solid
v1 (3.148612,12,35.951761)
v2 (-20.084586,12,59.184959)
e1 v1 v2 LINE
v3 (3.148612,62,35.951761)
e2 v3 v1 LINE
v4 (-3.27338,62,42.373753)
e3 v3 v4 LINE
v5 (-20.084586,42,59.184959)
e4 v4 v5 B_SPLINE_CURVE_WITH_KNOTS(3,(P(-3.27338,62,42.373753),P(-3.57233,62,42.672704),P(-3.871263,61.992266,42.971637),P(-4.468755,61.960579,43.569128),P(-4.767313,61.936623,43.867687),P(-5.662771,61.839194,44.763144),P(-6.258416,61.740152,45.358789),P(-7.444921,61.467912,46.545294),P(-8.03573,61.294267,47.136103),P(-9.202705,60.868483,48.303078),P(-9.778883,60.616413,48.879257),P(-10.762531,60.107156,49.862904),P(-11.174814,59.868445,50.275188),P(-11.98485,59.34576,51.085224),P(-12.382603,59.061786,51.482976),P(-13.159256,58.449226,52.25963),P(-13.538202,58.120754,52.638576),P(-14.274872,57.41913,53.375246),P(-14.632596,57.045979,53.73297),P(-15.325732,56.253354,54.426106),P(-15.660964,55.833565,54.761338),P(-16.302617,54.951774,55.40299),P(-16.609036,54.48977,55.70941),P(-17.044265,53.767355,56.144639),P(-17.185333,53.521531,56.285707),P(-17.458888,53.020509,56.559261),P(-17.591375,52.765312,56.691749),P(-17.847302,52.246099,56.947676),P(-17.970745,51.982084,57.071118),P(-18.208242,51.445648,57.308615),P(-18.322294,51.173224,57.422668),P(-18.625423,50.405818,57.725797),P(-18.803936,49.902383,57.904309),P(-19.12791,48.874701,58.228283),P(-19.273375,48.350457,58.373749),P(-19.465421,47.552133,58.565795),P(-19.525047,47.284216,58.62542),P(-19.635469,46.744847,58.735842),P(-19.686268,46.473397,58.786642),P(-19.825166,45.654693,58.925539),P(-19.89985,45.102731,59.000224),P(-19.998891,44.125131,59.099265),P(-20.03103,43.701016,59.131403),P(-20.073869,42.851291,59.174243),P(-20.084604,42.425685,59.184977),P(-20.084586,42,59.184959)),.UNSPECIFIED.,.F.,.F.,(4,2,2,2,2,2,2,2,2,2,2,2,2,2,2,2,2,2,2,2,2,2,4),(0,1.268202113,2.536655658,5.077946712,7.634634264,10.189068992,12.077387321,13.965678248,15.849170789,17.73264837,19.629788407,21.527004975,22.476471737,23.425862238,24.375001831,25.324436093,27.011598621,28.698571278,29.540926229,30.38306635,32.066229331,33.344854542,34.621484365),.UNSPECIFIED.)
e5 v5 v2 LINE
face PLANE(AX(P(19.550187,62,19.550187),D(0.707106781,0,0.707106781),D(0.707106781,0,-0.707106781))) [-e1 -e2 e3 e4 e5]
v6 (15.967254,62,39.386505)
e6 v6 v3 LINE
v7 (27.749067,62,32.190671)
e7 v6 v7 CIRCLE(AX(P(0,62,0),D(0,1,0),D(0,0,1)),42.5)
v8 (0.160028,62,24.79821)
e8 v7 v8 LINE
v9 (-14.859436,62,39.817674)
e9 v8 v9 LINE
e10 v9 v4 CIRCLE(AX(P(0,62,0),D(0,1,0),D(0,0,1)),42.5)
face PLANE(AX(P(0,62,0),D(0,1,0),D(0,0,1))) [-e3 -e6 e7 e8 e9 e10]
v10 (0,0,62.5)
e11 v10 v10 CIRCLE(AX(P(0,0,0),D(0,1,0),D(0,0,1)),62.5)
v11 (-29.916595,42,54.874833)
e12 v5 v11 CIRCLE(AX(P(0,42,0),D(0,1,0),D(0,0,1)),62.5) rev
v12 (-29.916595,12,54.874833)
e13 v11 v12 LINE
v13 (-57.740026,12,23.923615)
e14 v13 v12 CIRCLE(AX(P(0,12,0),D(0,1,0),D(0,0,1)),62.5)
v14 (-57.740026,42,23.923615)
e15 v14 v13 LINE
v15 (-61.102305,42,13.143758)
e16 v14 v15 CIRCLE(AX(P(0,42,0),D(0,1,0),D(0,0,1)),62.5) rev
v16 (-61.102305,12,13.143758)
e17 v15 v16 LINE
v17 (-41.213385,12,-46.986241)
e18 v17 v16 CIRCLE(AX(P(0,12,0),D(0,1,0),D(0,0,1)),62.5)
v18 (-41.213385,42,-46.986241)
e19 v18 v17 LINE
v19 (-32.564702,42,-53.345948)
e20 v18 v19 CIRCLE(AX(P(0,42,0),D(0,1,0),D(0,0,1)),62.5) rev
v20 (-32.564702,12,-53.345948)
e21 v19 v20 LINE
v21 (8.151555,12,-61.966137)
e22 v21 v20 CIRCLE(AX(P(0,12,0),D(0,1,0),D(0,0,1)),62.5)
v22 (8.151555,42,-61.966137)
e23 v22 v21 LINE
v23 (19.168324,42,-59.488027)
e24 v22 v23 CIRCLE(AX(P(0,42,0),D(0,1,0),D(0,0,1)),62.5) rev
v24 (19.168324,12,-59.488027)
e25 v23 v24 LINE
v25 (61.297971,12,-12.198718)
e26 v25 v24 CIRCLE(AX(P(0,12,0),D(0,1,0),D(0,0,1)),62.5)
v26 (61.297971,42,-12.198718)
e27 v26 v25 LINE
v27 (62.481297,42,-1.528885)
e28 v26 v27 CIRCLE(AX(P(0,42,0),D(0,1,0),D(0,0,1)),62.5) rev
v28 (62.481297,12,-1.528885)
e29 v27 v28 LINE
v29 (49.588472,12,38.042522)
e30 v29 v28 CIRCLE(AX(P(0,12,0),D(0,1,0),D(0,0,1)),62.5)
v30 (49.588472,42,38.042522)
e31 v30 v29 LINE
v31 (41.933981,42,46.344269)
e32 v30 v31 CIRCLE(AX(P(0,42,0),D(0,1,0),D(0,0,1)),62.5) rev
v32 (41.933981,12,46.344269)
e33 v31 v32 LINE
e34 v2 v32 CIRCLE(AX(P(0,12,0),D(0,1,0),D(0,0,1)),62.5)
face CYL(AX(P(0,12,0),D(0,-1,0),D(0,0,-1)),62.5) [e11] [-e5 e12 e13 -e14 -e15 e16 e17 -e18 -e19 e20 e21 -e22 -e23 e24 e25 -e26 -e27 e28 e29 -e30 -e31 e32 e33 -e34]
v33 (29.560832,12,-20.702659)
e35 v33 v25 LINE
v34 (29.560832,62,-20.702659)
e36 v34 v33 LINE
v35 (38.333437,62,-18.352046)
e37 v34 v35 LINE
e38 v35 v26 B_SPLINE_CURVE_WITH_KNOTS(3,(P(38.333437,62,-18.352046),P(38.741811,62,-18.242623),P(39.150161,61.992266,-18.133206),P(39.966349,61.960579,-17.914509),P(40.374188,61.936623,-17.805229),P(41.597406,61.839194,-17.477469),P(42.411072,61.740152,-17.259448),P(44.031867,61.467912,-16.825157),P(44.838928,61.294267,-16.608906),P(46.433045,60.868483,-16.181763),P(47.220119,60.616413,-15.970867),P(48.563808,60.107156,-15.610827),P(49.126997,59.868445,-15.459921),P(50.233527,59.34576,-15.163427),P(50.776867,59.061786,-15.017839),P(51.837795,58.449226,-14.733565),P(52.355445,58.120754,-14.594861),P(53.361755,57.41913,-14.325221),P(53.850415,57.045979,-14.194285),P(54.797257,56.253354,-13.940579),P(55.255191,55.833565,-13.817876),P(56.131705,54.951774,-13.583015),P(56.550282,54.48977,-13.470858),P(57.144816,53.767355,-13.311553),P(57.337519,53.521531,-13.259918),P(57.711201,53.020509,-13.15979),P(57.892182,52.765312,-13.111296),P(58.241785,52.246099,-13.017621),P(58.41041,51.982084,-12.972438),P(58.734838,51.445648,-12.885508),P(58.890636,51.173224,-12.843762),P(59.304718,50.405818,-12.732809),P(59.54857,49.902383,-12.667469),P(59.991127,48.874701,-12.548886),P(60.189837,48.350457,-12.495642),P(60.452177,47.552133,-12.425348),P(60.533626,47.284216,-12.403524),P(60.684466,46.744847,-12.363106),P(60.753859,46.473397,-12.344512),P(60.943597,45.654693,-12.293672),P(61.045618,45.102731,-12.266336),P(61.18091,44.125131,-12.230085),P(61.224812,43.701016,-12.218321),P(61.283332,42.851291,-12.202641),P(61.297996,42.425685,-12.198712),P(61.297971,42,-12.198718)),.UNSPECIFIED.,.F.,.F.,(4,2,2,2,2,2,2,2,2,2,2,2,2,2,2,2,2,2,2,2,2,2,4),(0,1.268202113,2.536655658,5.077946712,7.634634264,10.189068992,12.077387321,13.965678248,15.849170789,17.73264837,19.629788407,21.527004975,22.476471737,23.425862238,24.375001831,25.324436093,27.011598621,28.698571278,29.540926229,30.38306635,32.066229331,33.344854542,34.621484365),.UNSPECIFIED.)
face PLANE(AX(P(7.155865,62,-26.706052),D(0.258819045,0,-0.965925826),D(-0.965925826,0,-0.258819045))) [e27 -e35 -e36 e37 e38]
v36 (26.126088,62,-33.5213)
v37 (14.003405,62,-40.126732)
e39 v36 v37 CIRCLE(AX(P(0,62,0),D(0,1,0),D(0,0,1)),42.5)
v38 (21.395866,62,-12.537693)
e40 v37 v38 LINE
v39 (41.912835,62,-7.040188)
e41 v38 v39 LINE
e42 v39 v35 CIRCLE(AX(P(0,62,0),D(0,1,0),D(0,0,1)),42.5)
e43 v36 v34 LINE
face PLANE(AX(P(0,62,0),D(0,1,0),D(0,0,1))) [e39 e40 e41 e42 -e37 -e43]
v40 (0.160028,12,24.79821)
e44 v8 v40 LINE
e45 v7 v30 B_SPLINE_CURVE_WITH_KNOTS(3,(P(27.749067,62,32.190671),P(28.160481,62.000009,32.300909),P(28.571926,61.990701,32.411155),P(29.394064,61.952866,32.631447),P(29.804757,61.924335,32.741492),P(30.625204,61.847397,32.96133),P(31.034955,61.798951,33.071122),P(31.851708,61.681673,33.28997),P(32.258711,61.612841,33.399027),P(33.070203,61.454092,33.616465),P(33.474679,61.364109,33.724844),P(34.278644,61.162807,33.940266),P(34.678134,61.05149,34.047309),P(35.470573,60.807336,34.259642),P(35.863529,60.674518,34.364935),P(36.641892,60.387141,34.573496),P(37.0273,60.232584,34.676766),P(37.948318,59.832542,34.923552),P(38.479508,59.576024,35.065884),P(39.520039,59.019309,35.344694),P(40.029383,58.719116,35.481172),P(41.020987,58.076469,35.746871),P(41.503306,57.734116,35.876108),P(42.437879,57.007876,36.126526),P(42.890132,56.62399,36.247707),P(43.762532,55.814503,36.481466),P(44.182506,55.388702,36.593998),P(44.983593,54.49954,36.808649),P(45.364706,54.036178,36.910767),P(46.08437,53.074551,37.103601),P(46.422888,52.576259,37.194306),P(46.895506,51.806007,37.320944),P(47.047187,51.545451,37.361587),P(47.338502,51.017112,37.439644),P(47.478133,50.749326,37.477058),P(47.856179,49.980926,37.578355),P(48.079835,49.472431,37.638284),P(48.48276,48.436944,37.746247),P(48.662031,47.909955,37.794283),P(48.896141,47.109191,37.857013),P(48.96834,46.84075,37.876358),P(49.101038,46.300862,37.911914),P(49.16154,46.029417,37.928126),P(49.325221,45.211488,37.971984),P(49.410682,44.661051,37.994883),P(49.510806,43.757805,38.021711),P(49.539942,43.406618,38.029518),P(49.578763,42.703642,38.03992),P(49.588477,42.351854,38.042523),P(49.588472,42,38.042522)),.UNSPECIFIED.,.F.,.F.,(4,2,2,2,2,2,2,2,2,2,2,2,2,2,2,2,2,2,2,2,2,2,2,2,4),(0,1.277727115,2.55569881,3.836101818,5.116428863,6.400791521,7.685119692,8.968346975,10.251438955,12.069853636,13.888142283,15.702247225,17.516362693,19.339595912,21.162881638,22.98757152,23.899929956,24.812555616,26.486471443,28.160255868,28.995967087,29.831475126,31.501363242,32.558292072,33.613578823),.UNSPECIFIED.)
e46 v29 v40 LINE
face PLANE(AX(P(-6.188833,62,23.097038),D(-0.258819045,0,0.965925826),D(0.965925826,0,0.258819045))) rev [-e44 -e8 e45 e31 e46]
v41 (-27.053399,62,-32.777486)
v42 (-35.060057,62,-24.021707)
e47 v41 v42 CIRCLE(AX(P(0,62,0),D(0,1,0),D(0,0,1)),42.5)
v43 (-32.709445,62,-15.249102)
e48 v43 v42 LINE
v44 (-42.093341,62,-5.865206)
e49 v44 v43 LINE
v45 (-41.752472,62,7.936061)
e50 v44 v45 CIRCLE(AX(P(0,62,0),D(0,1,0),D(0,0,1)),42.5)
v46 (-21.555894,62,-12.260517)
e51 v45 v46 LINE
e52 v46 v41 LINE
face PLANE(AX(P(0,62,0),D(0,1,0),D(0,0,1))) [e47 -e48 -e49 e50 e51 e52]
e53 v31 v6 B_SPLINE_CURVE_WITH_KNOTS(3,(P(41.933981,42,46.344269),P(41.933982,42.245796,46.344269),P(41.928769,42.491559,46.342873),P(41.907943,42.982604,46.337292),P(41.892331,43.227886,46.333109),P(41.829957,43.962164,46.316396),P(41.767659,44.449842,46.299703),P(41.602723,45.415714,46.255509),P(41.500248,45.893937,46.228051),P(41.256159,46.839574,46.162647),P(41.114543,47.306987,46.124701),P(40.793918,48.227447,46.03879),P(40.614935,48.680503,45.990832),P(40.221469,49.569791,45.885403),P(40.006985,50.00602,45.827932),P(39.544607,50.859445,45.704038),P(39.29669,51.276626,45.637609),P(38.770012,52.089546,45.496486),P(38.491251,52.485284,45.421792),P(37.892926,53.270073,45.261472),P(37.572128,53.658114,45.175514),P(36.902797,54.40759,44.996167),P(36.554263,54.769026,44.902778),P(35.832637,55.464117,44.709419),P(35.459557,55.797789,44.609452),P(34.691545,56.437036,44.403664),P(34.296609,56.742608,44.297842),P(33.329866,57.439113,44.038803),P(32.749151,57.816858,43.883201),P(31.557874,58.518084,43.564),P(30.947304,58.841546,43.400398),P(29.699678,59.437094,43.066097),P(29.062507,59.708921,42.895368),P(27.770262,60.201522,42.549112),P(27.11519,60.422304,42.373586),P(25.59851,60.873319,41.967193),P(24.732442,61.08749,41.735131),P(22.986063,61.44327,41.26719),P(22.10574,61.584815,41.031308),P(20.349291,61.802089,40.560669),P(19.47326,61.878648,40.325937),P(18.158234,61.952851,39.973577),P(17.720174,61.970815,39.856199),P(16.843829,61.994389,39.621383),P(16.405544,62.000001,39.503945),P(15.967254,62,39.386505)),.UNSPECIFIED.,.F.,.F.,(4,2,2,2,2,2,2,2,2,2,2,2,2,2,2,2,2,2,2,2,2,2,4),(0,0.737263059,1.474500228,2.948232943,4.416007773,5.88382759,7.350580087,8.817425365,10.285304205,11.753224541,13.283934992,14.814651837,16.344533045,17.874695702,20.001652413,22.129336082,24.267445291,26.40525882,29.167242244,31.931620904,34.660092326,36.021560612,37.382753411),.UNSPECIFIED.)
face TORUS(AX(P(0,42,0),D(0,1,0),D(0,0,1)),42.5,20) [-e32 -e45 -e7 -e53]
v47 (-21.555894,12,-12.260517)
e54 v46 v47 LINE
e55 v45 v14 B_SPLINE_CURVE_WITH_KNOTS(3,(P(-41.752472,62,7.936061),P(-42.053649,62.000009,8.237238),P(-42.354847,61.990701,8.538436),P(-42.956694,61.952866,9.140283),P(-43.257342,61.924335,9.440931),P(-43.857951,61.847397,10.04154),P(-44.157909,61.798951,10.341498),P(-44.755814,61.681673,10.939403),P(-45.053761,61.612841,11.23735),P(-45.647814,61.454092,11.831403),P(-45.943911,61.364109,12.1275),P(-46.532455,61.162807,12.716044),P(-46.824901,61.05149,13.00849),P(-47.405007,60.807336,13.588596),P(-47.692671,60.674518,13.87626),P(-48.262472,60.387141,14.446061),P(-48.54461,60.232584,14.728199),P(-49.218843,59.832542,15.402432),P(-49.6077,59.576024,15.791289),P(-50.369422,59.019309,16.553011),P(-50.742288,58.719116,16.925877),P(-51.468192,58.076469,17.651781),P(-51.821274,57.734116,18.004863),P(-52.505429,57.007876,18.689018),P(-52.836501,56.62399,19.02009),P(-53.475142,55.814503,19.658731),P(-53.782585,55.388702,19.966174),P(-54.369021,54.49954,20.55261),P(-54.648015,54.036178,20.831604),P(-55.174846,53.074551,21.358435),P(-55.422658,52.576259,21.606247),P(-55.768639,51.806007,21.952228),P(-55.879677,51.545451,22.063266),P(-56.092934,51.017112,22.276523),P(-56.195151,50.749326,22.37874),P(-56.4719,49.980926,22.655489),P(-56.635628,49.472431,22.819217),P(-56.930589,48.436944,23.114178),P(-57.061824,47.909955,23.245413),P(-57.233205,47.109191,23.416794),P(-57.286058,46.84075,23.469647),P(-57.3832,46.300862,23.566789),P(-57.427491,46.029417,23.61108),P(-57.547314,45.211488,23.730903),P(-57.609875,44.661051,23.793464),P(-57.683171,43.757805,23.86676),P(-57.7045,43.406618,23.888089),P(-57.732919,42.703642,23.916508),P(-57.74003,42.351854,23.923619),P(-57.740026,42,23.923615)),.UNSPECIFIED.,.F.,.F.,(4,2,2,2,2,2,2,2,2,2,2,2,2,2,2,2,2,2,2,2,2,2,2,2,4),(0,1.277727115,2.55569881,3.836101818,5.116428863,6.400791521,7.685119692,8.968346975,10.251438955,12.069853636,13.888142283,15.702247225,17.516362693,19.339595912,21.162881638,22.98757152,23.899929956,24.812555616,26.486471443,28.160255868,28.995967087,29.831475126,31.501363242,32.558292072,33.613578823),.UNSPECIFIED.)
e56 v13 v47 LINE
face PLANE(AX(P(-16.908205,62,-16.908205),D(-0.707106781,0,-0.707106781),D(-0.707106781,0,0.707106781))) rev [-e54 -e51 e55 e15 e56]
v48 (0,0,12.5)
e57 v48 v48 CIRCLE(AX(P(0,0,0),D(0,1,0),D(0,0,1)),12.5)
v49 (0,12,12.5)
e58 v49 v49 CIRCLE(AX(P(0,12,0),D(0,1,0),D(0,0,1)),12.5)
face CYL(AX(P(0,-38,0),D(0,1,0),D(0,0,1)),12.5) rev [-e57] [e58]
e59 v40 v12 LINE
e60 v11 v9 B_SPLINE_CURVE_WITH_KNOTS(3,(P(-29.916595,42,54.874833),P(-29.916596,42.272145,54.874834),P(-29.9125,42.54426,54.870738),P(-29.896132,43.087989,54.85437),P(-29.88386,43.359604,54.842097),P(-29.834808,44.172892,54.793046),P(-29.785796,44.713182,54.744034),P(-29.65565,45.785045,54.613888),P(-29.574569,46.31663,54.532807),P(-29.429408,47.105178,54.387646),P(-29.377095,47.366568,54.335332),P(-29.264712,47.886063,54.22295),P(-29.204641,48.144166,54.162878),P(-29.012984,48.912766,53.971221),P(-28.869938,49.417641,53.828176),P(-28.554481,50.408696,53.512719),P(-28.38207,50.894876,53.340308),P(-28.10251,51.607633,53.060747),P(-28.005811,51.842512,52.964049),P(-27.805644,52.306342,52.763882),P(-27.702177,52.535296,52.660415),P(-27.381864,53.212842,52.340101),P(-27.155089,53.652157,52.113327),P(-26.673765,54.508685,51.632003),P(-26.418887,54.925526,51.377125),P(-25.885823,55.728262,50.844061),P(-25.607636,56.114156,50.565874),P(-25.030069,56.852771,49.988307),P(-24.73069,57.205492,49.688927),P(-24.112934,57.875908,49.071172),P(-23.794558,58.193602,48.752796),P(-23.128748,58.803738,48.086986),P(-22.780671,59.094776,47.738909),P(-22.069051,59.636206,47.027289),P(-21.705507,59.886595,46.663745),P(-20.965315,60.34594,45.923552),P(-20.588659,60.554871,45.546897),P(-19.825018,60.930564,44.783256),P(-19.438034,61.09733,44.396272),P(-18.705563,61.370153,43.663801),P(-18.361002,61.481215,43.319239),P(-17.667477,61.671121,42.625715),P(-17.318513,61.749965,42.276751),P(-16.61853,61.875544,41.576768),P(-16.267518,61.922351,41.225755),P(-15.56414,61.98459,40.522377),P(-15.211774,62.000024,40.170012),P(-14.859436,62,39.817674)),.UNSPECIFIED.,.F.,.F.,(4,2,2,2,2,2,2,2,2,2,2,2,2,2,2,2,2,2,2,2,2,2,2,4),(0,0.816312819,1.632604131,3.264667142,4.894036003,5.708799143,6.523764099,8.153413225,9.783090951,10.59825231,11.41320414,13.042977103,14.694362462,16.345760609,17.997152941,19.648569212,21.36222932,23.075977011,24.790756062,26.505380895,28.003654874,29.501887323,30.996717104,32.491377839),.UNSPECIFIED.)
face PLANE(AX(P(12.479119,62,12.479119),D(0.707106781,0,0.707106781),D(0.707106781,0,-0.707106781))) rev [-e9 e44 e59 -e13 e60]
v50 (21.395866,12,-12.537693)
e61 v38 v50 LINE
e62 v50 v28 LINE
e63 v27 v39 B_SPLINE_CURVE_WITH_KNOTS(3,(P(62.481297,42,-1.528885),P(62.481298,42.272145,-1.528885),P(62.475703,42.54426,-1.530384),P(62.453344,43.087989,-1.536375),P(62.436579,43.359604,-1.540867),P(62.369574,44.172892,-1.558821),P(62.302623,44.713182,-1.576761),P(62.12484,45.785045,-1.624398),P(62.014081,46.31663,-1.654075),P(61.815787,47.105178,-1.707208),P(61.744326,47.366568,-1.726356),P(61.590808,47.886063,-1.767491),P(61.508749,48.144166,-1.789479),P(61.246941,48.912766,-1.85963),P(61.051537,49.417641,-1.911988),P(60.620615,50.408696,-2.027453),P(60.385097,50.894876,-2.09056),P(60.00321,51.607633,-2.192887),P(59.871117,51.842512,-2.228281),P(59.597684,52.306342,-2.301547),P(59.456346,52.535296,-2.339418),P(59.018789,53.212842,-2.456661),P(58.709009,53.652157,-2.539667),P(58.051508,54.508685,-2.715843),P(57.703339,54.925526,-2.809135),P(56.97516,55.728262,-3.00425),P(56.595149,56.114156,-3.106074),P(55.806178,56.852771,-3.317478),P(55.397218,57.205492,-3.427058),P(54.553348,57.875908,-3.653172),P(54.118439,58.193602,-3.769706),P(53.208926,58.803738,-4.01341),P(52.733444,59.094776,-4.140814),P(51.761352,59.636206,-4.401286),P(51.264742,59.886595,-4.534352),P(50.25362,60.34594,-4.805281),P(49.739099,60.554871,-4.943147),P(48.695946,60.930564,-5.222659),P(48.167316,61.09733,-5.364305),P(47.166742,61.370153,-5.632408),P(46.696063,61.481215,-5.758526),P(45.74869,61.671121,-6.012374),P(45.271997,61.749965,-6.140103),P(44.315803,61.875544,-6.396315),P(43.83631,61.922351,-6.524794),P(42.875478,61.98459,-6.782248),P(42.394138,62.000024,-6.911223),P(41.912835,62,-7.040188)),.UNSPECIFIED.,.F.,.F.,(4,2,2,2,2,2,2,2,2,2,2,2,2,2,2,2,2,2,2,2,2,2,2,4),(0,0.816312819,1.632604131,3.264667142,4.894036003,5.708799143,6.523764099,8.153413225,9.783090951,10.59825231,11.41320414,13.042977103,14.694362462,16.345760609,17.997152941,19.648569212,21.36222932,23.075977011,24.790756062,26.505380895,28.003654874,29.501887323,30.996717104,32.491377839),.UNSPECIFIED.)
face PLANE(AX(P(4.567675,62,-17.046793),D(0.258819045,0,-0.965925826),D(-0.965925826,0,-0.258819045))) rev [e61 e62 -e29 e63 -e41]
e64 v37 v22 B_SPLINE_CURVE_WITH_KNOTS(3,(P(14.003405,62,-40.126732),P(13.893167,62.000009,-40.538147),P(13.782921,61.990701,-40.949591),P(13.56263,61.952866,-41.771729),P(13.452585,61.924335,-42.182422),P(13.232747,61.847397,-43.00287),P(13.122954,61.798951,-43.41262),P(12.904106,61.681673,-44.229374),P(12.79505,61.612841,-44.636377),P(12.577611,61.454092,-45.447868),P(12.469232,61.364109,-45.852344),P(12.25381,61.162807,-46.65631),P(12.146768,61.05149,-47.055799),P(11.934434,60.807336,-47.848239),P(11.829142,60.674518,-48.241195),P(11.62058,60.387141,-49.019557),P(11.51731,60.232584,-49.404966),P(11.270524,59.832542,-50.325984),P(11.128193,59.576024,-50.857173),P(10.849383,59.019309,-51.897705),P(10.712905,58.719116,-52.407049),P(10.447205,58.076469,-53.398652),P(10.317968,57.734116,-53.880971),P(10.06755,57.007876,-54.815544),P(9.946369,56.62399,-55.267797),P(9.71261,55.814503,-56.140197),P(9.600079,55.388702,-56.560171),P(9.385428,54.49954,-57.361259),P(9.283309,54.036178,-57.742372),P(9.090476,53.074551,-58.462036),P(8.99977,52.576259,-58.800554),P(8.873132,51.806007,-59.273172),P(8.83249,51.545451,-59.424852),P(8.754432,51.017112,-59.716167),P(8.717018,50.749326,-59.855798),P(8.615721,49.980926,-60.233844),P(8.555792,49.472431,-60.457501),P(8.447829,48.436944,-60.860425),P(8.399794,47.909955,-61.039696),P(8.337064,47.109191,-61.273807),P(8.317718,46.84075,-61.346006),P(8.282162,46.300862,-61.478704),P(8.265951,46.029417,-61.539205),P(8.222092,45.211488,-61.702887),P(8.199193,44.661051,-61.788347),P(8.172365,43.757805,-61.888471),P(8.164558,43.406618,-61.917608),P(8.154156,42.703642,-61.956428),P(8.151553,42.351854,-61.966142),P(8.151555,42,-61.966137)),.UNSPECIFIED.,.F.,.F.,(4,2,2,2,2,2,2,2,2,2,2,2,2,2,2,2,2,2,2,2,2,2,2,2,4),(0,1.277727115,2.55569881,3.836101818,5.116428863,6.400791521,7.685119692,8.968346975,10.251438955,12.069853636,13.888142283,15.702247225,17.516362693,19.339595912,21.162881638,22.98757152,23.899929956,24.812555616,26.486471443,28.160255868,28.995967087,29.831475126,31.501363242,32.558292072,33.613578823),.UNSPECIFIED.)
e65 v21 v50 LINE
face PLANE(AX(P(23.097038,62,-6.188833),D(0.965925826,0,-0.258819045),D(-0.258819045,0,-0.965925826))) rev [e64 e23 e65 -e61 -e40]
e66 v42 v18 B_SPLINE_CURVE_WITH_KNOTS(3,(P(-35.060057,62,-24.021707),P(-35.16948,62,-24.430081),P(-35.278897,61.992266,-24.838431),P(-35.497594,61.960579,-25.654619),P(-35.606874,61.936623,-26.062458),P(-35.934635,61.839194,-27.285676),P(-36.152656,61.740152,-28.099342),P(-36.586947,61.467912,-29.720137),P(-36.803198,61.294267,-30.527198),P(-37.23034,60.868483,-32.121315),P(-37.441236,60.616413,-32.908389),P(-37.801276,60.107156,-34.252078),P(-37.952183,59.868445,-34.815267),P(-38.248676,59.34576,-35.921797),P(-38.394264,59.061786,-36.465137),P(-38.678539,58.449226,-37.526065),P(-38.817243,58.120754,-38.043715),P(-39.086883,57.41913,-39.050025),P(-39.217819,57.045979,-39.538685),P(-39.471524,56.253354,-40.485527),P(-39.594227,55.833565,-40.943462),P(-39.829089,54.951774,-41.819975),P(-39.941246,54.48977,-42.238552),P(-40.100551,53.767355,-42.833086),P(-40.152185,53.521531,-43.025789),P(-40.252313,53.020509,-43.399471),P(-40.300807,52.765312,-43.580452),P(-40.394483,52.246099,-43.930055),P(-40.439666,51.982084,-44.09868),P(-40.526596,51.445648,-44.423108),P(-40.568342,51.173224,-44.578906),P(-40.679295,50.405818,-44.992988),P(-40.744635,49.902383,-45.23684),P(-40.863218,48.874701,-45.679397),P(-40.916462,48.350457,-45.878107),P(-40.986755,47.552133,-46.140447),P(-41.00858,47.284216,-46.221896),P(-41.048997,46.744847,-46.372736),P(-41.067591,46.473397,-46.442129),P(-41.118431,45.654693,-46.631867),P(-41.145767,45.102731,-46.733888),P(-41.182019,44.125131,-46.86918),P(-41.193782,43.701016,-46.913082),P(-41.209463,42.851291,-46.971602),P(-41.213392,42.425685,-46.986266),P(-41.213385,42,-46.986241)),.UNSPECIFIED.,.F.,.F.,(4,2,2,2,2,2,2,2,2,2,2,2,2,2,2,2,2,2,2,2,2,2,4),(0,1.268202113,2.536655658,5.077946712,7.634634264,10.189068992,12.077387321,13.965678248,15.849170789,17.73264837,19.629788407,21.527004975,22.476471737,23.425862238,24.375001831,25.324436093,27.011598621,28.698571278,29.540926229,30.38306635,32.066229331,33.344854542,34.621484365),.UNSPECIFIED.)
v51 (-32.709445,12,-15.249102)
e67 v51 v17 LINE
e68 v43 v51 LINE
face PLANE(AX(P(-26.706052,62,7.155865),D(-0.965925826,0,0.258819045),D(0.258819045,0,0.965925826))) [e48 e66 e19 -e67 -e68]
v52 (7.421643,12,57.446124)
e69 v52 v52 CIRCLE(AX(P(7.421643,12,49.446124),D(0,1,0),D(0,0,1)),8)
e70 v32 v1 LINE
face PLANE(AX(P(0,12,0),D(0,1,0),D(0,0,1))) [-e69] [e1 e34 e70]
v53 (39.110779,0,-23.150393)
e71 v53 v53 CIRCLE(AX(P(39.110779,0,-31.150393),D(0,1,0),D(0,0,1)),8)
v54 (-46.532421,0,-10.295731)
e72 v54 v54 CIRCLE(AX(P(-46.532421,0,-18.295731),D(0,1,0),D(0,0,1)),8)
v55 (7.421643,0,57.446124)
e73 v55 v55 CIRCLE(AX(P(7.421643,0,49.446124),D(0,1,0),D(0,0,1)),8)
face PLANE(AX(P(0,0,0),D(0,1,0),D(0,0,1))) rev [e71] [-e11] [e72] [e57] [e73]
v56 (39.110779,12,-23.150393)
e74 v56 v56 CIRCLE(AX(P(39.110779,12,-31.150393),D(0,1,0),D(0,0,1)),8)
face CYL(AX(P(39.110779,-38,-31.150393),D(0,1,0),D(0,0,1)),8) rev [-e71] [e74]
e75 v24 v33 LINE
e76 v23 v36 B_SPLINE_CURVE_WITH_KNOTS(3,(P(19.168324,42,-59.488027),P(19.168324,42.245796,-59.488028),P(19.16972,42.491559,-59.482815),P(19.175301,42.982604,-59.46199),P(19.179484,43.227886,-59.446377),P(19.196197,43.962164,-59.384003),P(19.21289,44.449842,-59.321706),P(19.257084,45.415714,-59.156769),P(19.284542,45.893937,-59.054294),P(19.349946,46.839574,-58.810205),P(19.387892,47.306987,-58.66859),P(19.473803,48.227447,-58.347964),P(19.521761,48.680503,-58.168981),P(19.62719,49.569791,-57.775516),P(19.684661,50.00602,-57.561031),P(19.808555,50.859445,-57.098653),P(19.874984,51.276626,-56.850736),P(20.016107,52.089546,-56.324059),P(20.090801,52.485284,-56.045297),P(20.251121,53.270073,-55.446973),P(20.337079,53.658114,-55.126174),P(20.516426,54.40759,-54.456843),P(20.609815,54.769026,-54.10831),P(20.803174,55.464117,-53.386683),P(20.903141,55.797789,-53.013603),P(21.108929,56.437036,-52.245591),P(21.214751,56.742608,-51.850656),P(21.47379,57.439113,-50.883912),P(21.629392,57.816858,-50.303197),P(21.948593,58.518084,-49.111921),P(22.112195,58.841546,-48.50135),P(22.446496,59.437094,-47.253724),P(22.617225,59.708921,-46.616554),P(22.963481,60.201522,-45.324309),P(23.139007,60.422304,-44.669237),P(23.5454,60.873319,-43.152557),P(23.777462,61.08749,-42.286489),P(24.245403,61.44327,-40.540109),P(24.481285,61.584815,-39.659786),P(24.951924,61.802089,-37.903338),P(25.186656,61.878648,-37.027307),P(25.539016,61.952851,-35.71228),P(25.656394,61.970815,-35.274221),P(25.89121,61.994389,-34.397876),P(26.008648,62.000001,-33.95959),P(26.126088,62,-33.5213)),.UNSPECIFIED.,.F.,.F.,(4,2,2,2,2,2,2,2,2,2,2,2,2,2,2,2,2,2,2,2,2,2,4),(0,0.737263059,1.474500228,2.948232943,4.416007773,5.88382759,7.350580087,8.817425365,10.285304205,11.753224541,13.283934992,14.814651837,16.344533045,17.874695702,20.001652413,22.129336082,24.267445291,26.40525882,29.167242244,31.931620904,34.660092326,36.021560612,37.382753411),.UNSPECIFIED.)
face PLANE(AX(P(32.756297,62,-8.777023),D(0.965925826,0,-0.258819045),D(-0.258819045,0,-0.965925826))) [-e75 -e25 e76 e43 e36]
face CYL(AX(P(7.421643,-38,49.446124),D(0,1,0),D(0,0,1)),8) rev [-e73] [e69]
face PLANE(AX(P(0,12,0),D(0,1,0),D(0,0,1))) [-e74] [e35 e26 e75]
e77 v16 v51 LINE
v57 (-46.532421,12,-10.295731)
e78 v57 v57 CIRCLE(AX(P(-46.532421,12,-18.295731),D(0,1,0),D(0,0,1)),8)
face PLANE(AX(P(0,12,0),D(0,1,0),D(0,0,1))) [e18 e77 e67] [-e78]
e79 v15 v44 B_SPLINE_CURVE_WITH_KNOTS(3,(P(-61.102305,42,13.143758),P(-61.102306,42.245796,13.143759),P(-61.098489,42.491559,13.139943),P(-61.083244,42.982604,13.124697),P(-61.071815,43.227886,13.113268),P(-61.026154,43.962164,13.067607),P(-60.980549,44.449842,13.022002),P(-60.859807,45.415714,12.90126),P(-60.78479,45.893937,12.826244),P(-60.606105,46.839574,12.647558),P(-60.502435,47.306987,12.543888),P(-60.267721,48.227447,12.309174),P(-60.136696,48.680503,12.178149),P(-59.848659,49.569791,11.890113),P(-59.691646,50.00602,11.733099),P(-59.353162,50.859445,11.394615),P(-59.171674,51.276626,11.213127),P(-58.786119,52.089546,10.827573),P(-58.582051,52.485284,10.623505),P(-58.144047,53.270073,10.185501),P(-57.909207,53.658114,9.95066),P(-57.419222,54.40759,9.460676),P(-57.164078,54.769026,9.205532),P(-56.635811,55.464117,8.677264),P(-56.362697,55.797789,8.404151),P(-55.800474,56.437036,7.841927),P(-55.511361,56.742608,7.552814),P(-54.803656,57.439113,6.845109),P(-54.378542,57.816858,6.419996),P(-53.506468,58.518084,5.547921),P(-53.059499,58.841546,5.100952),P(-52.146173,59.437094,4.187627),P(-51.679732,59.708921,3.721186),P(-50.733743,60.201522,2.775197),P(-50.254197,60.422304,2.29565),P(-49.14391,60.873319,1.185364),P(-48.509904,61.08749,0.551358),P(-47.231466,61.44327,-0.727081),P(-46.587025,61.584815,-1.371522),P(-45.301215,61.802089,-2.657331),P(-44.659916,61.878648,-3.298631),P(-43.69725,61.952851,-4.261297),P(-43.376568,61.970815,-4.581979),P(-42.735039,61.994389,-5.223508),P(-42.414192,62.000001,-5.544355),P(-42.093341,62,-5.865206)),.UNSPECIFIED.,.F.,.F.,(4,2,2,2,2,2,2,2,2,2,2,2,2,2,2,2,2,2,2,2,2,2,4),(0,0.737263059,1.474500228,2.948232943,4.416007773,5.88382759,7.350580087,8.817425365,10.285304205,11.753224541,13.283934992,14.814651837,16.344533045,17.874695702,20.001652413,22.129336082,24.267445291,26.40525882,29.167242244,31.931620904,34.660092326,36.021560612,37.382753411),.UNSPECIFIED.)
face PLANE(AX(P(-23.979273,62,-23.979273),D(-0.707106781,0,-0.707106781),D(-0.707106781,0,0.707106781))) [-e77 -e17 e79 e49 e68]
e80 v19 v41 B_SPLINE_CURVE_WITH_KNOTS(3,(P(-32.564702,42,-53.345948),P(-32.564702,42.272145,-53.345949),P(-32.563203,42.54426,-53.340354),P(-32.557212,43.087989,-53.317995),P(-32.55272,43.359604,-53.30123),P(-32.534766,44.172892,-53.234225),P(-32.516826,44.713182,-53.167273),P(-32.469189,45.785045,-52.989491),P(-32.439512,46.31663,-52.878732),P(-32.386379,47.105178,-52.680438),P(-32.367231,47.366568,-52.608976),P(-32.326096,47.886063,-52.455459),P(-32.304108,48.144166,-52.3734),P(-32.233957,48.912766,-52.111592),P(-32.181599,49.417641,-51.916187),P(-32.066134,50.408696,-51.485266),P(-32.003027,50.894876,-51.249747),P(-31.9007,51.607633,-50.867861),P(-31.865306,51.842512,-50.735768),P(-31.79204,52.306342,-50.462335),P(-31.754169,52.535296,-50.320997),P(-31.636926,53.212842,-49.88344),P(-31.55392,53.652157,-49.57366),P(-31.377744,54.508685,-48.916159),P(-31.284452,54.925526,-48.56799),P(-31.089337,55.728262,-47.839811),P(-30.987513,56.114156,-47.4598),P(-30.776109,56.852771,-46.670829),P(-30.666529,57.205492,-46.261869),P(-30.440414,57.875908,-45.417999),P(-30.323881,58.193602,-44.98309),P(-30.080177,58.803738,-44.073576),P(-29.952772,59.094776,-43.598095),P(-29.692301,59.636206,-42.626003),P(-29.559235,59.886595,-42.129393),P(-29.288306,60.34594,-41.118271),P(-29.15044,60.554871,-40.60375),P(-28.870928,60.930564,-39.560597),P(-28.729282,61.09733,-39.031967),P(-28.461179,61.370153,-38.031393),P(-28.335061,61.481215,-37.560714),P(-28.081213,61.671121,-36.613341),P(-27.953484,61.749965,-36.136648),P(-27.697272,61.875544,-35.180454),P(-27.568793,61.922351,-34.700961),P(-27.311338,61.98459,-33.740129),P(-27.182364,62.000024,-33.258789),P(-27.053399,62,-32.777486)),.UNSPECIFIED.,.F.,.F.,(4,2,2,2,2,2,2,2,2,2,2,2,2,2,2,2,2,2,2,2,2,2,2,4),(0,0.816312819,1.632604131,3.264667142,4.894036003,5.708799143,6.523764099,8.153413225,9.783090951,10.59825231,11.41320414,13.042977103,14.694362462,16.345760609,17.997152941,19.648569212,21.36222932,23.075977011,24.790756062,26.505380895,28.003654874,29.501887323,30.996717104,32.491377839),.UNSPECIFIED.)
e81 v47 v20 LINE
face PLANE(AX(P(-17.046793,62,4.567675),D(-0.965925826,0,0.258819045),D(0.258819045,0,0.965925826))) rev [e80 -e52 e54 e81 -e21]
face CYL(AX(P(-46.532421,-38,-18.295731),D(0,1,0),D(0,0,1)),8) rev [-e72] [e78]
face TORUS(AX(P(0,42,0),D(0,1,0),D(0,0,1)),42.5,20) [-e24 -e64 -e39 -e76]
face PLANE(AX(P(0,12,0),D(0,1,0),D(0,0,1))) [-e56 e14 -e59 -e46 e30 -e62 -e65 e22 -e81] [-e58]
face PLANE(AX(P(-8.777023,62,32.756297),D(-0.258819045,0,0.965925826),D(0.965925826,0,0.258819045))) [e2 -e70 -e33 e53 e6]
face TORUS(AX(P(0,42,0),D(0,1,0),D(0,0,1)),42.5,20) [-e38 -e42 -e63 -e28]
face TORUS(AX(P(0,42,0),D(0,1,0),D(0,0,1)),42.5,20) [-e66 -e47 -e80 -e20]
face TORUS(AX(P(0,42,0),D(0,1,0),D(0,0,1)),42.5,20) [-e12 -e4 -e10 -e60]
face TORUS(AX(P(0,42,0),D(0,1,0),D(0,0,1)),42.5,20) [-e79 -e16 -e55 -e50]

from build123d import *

# Parameters (mm, degrees)
SKETCH1_R           = 62.5
BOSS_EXTRUDE1_DEPTH = 12
BOSS_EXTRUDE2_DEPTH = 50
FILLET1_R           = 20
SKETCH3_R           = 12.5
CUT_EXTRUDE1_DEPTH  = 50
SKETCH4_R           = 8
CUT_EXTRUDE2_DEPTH  = 50


with BuildPart() as part:
    # Sketch1 → Boss-Extrude1 (new body)
    with BuildSketch(Plane(origin=(0, 0, 0), x_dir=(1, 0, 0), z_dir=(0, 1, 0))):
        with Locations(Location((0, 0, 0), (0, 0, 270))):
            Circle(SKETCH1_R)
    extrude(amount=BOSS_EXTRUDE1_DEPTH)

    # Sketch2 → Boss-Extrude2 (add)
    with BuildSketch(Plane(origin=(0, 12, 0), x_dir=(1, 0, 0), z_dir=(0, 1, 0))):
        with BuildLine():
            ThreePointArc((19.168323988, 59.488026993), (13.716019775, 60.976395446), (8.151554557, 61.96613719))
            Line((8.151554557, 61.96613719), (21.395866241, 12.537693074))
            Line((21.395866241, 12.537693074), (62.481297287, 1.528885005))
            ThreePointArc((62.481297287, 1.528885005), (62.119144902, 6.889255161), (61.297971235, 12.198718069))
            Line((61.297971235, 12.198718069), (29.560832051, 20.702658884))
            Line((29.560832051, 20.702658884), (19.168323988, 59.488026993))
        make_face()
        with BuildLine():
            ThreePointArc((41.933980603, -46.344269018), (45.9490976, -42.366619287), (49.588471703, -38.042521922))
            Line((49.588471703, -38.042521922), (0.160027587, -24.798210238))
            Line((0.160027587, -24.798210238), (-29.91659539, -54.874833214))
            ThreePointArc((-29.91659539, -54.874833214), (-25.093302468, -57.241385127), (-20.084585876, -59.184959324))
            Line((-20.084585876, -59.184959324), (3.148612494, -35.951760955))
            Line((3.148612494, -35.951760955), (41.933980603, -46.344269018))
        make_face()
        with BuildLine():
            ThreePointArc((-61.102304591, -13.143757975), (-59.665117375, -18.609776159), (-57.74002626, -23.923615268))
            Line((-57.74002626, -23.923615268), (-21.555893828, 12.260517164))
            Line((-21.555893828, 12.260517164), (-32.564701897, 53.345948209))
            ThreePointArc((-32.564701897, 53.345948209), (-37.025842434, 50.352129966), (-41.213385359, 46.986241255))
            Line((-41.213385359, 46.986241255), (-32.709444544, 15.249102071))
            Line((-32.709444544, 15.249102071), (-61.102304591, -13.143757975))
        make_face()
    extrude(amount=BOSS_EXTRUDE2_DEPTH)

    # Fillet1
    # the kernel refuses this fillet: 20 mm, written as the material it takes off along each edge
    with BuildSketch(Plane(origin=(0, 62, 0), x_dir=(0.24928364261100788, 0, -0.9684305166229467), z_dir=(0.9684305166229467, 0, 0.24928364261100788))) as fillet1_piece_1:
        with BuildLine():
            CenterArc((62.5 - FILLET1_R, -FILLET1_R), FILLET1_R, 0, 90)
            Line((62.5 - FILLET1_R, 0), (62.5, 0))
            Line((62.5, 0), (62.5, -FILLET1_R))
        make_face()
    revolve(axis=Axis((0, 62, 0), (0, 1, 0)), revolution_arc=101.527179198, mode=Mode.SUBTRACT)
    with BuildSketch(Plane(origin=(0, 62, 0), x_dir=(-0.8319838819593003, 0, -0.5547998018744537), z_dir=(0.5547998018744537, 0, -0.8319838819593003))) as fillet1_piece_2:
        with BuildLine():
            CenterArc((62.5 - FILLET1_R, -FILLET1_R), FILLET1_R, 0, 90)
            Line((62.5 - FILLET1_R, 0), (62.5, 0))
            Line((62.5, 0), (62.5, -FILLET1_R))
        make_face()
    revolve(axis=Axis((0, 62, 0), (0, 1, 0)), revolution_arc=102.039649765, mode=Mode.SUBTRACT)
    with BuildSketch(Plane(origin=(0, 62, 0), x_dir=(-0.9633272505010871, 0, 0.26832929106233594), z_dir=(-0.26832929106233594, 0, -0.9633272505010871))) as fillet1_piece_3:
        with BuildLine():
            CenterArc((62.5 - FILLET1_R, -FILLET1_R), FILLET1_R, 0, 90)
            Line((62.5 - FILLET1_R, 0), (62.5, 0))
            Line((62.5, 0), (62.5, -FILLET1_R))
        make_face()
    revolve(axis=Axis((0, 62, 0), (0, 1, 0)), revolution_arc=101.527179198, mode=Mode.SUBTRACT)
    with BuildSketch(Plane(origin=(0, 62, 0), x_dir=(-0.06447878145815908, 0, 0.9979190782531773), z_dir=(-0.9979190782531773, 0, -0.06447878145815908))) as fillet1_piece_4:
        with BuildLine():
            CenterArc((62.5 - FILLET1_R, -FILLET1_R), FILLET1_R, 0, 90)
            Line((62.5 - FILLET1_R, 0), (62.5, 0))
            Line((62.5, 0), (62.5, -FILLET1_R))
        make_face()
    revolve(axis=Axis((0, 62, 0), (0, 1, 0)), revolution_arc=102.039649765, mode=Mode.SUBTRACT)
    with BuildSketch(Plane(origin=(0, 62, 0), x_dir=(0.8964626634174491, 0, -0.443119276378825), z_dir=(0.443119276378825, 0, 0.8964626634174491))) as fillet1_piece_5:
        with BuildLine():
            CenterArc((62.5 - FILLET1_R, -FILLET1_R), FILLET1_R, 0, 90)
            Line((62.5 - FILLET1_R, 0), (62.5, 0))
            Line((62.5, 0), (62.5, -FILLET1_R))
        make_face()
    revolve(axis=Axis((0, 62, 0), (0, 1, 0)), revolution_arc=102.039649765, mode=Mode.SUBTRACT)
    with BuildSketch(Plane(origin=(0, 62, 0), x_dir=(0.7140436078899985, 0, 0.7001012255605856), z_dir=(-0.7001012255605856, 0, 0.7140436078899985))) as fillet1_piece_6:
        with BuildLine():
            CenterArc((62.5 - FILLET1_R, -FILLET1_R), FILLET1_R, 0, 90)
            Line((62.5 - FILLET1_R, 0), (62.5, 0))
            Line((62.5, 0), (62.5, -FILLET1_R))
        make_face()
    revolve(axis=Axis((0, 62, 0), (0, 1, 0)), revolution_arc=101.527179198, mode=Mode.SUBTRACT)

    # Sketch3 → Cut-Extrude1 (cut)
    with BuildSketch(Plane(origin=(0, 12, 0), x_dir=(1, 0, 0), z_dir=(0, 1, 0))):
        with Locations(Location((0, 0, 0), (0, 0, 270))):
            Circle(SKETCH3_R)
    extrude(amount=-CUT_EXTRUDE1_DEPTH, mode=Mode.SUBTRACT)

    # Sketch4 → Cut-Extrude2 (cut)
    with BuildSketch(Plane(origin=(0, 12, 0), x_dir=(1, 0, 0), z_dir=(0, 1, 0))):
        with Locations(Location((39.110778617, 31.150393192, 0), (0, 0, 270))):
            Circle(SKETCH4_R)
        with Locations(Location((7.421642534, -49.44612444, 0), (0, 0, 270))):
            Circle(SKETCH4_R)
        with Locations(Location((-46.53242115, 18.295731248, 0), (0, 0, 270))):
            Circle(SKETCH4_R)
    extrude(amount=-CUT_EXTRUDE2_DEPTH, mode=Mode.SUBTRACT)


solid = part.part
